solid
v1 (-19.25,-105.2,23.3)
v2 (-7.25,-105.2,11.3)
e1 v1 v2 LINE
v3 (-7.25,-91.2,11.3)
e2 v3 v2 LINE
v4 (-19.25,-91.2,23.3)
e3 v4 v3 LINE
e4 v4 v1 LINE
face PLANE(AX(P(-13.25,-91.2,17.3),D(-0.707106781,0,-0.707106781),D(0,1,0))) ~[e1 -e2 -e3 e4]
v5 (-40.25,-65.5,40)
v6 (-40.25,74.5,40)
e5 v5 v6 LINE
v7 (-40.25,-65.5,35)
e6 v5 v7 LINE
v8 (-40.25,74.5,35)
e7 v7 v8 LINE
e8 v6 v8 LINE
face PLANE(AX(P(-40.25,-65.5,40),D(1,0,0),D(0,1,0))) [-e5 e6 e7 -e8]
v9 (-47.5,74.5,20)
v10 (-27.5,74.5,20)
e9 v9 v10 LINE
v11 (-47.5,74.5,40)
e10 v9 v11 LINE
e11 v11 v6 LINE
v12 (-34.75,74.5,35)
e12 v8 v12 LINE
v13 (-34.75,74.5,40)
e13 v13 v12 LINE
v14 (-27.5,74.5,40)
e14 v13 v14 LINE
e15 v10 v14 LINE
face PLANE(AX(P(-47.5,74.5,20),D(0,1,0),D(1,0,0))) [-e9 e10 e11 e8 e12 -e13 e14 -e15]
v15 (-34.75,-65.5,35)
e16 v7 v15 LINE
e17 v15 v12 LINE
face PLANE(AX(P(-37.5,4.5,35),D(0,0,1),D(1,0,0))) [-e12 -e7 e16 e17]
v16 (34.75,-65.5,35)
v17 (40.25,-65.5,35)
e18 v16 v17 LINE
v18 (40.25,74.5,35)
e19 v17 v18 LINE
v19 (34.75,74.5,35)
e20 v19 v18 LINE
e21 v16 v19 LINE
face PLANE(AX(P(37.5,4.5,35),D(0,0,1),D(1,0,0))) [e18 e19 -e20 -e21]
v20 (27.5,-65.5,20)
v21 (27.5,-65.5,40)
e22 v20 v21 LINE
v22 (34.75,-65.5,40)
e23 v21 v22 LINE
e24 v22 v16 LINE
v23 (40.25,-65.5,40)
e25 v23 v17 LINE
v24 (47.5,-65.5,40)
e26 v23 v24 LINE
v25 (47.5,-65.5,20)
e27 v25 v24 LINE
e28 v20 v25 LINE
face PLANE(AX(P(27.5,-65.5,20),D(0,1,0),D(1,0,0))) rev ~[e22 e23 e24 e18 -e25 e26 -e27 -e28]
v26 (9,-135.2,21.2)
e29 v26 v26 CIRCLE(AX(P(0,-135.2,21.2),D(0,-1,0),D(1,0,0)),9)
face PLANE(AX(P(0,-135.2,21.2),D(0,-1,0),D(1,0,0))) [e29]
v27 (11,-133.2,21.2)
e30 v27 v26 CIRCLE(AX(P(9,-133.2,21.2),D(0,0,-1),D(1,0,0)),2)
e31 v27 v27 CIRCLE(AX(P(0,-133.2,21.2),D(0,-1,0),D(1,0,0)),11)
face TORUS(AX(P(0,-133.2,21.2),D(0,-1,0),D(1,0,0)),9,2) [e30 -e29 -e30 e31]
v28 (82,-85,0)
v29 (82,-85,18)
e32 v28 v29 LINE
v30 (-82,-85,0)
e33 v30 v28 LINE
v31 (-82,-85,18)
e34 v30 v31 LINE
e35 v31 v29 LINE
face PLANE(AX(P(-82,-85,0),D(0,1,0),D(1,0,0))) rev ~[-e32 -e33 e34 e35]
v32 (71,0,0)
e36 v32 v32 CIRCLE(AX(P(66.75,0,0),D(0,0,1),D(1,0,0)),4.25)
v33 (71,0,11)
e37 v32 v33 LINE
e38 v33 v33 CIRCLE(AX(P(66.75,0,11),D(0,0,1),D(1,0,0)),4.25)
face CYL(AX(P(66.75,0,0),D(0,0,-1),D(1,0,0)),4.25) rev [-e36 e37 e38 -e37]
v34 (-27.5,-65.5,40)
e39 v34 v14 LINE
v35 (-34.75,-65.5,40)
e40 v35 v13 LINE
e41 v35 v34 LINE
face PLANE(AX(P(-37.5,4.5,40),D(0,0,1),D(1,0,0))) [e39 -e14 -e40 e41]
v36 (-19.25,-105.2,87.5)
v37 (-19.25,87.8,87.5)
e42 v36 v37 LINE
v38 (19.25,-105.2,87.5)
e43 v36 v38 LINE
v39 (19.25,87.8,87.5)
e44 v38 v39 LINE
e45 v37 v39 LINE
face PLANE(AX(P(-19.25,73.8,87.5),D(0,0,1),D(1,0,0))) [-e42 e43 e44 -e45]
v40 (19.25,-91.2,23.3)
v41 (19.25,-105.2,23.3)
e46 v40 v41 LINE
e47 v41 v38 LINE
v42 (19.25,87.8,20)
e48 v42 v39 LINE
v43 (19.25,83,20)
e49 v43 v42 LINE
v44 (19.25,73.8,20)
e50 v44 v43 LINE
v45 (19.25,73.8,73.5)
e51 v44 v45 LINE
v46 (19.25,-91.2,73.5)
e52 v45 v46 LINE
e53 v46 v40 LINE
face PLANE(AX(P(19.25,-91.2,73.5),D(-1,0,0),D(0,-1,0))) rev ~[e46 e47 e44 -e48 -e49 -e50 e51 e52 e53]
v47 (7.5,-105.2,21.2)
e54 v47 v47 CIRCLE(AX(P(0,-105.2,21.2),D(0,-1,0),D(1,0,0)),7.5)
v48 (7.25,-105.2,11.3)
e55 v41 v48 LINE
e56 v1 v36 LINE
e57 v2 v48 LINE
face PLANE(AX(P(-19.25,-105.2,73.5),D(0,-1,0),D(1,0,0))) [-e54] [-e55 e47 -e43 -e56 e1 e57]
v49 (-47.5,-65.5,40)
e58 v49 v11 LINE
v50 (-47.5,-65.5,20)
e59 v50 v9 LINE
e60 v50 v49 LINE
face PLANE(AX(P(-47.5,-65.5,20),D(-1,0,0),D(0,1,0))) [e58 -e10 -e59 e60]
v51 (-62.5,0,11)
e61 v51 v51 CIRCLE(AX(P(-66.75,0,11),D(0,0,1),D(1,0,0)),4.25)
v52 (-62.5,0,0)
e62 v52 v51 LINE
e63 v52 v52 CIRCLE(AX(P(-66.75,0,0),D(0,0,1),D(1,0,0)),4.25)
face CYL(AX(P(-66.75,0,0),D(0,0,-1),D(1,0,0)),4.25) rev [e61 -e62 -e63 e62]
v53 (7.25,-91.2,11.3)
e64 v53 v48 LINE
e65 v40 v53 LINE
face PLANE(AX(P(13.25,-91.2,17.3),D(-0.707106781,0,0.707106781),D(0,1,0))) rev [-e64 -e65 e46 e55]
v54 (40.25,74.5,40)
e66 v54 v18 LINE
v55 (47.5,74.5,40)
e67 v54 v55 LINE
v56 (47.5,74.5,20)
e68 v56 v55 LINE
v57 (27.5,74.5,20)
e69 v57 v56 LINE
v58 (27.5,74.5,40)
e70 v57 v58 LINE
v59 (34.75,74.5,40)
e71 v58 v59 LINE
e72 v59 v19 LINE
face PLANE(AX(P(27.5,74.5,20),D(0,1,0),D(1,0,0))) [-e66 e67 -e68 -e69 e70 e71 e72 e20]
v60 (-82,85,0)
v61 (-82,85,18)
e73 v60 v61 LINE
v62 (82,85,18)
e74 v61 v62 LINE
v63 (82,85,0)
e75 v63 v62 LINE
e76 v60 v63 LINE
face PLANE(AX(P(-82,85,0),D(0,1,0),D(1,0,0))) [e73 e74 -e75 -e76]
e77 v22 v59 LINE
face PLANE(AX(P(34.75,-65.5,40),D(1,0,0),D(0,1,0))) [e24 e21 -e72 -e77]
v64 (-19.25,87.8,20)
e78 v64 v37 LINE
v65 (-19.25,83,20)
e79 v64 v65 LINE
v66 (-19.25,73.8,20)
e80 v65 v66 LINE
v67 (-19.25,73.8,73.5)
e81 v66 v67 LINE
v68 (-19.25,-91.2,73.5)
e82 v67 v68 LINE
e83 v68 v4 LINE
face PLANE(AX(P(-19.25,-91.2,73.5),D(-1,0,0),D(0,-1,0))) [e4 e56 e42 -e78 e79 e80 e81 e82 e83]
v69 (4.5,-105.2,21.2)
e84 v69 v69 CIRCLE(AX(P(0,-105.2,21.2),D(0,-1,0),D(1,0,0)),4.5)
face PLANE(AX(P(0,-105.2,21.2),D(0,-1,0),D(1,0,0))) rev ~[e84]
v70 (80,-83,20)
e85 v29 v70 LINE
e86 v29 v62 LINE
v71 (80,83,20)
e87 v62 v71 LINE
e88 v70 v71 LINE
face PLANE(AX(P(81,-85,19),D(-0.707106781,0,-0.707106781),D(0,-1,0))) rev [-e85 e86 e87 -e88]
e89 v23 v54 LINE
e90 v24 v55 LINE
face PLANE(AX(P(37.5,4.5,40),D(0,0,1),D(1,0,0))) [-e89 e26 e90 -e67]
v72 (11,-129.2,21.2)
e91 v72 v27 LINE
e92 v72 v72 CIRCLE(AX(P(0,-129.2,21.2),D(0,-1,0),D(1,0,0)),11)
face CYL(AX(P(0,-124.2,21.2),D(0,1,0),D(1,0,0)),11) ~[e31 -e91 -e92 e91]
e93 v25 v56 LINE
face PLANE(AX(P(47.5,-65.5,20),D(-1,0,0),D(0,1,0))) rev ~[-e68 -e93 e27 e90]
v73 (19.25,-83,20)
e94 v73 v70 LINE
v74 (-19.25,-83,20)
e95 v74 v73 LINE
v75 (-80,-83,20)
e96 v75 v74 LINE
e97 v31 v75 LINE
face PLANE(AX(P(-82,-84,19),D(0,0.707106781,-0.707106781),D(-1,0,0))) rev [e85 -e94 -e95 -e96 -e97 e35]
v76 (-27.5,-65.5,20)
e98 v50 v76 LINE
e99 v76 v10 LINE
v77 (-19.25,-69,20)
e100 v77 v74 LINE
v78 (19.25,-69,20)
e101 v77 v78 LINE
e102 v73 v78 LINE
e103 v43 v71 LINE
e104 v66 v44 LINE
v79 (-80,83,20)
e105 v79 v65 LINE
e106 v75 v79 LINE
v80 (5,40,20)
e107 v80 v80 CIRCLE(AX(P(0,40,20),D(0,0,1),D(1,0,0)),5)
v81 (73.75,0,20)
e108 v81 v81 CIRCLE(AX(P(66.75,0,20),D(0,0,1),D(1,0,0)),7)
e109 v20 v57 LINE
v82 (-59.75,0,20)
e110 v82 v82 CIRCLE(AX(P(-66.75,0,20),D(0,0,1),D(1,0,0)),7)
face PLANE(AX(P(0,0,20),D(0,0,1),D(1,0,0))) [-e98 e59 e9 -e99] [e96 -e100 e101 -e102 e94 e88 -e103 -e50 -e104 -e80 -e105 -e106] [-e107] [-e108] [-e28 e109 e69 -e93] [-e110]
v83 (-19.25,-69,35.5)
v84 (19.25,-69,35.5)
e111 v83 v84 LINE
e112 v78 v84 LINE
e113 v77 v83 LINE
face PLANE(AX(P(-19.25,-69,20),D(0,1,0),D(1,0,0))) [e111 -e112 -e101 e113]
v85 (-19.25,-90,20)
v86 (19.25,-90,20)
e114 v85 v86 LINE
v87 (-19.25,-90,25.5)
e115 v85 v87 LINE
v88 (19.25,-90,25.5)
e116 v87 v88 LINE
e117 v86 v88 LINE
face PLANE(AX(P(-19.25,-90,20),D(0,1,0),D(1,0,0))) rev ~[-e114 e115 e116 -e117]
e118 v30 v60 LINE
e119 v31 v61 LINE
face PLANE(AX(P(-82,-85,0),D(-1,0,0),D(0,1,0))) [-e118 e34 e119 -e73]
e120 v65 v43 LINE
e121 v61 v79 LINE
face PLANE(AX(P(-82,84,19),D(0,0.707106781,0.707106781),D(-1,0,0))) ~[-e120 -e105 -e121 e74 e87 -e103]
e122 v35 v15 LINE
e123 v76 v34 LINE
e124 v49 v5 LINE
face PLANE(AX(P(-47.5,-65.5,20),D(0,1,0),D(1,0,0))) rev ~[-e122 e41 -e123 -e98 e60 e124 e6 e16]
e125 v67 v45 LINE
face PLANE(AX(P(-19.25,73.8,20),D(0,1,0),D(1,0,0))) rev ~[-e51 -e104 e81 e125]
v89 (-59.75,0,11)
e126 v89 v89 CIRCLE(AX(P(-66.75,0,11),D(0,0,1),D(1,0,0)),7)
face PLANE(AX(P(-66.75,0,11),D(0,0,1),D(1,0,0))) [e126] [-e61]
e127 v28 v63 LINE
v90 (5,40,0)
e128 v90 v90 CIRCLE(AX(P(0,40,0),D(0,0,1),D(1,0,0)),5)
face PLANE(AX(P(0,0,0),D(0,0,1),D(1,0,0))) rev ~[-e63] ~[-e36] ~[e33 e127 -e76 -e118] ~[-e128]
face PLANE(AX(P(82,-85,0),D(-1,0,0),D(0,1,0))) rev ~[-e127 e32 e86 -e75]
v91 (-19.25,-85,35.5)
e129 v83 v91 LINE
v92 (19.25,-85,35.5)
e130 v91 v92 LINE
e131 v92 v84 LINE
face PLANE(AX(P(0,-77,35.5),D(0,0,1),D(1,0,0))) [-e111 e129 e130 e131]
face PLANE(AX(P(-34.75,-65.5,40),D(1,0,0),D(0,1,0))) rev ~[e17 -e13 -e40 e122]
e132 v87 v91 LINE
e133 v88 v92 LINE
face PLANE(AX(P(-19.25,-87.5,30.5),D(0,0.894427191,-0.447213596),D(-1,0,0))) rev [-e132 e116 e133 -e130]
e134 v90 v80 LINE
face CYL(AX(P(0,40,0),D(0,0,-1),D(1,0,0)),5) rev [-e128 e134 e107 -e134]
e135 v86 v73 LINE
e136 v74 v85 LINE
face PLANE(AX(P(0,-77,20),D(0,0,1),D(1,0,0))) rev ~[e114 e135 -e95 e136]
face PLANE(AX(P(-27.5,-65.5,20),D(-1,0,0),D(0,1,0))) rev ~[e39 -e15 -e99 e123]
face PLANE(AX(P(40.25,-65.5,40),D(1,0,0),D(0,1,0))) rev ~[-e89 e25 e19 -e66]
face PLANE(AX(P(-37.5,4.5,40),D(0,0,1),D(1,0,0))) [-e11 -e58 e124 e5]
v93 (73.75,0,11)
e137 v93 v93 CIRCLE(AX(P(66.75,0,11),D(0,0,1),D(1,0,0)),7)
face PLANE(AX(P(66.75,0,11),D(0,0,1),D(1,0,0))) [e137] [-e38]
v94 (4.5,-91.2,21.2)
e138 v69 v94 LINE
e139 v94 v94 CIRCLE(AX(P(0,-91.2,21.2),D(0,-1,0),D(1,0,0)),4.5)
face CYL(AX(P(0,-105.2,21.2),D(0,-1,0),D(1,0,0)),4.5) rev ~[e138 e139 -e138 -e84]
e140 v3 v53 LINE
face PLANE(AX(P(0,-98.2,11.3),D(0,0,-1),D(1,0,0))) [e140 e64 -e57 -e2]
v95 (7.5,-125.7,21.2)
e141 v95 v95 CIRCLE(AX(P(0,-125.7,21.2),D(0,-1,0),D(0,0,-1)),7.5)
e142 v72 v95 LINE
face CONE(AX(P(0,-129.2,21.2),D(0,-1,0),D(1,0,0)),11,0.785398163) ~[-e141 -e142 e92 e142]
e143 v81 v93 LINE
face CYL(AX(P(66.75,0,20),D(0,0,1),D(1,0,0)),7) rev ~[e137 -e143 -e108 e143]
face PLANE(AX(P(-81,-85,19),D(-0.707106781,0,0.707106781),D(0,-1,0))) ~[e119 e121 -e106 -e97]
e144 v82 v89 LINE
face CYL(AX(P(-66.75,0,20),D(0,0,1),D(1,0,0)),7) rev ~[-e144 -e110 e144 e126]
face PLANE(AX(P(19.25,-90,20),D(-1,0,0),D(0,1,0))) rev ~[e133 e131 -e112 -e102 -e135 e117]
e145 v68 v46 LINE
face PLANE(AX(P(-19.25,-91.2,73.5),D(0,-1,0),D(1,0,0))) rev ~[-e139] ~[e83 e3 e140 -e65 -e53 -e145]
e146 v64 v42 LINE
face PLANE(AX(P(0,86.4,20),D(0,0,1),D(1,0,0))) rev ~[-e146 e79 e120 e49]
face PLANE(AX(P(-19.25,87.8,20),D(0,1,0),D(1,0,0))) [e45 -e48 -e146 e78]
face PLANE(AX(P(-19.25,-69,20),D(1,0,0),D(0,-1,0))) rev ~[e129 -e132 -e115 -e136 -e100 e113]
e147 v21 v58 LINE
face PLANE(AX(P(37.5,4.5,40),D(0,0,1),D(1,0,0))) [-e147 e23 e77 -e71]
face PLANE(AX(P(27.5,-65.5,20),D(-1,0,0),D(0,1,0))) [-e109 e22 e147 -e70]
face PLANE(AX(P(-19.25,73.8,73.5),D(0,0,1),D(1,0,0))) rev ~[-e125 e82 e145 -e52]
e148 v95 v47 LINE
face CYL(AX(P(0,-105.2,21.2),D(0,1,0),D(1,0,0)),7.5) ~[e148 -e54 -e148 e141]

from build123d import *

# Parameters (mm, degrees)
F0_W         = 164
F0_H         = 170
F0_R         = 4.25
F0_R_2       = 5
F1_DEPTH     = 20
F3_SIZE      = 2
F4_DEPTH     = 20
F2_R         = 7
F2_R_2       = 4.25
F5_DEPTH     = 9
F6_W         = 20
F6_H         = 140
F7_DEPTH     = 20
F8_W         = 5.5
F8_H         = 140
F9_DEPTH     = 5
F10_W        = 38.5
F10_H        = 2.8
F10_H_2      = 11.2
F11_DEPTH    = 67.5
F12_W        = 38.5
F12_H        = 14
F13_DEPTH    = 179
F14_W        = 38.5
F14_H        = 14
F15_DEPTH    = 62.2
F16_SIZE     = 12
F17_R        = 4.5
F18_DEPTH    = 14
F19_R        = 7.5
F19_R_2      = 4.5
F20_DEPTH    = 19
F21_R        = 11
F21_R_2      = 7.5
F22_DEPTH    = 11
F23_S5_R     = 7.5
F23_T6_DEPTH = 17
F24_R        = 2
F25_W        = 38.5
F25_H        = 16
F25_H_2      = 5
F26_DEPTH    = 15.5
F27_SIZE2    = 5
F27_SIZE     = 10


# Not quite as in the source:
# - a fillet or chamfer that OpenCascade refuses, or shapes differently, is made with other operations: its cross-section is extruded or revolved along the edge and cut away or added


with BuildPart() as f1:
    # F0 (on Top) → F1 (new body)
    with BuildSketch(Plane.XY):
        Rectangle(F0_W, F0_H)
        with Locations((-66.75, 0)):
            Circle(F0_R, mode=Mode.SUBTRACT)
        with Locations((0, 40)):
            Circle(F0_R_2, mode=Mode.SUBTRACT)
        with Locations((66.75, 0)):
            Circle(F0_R, mode=Mode.SUBTRACT)
    extrude(amount=F1_DEPTH)

    # F3
    f3_edges = [f1.edges().sort_by_distance(p)[0] for p in [
        (82, 0, 20),
        (0, -85, 20),
        (0, 85, 20),
        (-82, 0, 20),
    ]]
    chamfer(f3_edges, length=F3_SIZE)

    # F0 (on Top) → F4 (cut)
    with BuildSketch(Plane.XY):
        with Locations((0, 40)):
            Circle(F0_R_2)
    extrude(amount=F4_DEPTH, mode=Mode.SUBTRACT)

    # F2 (on face) → F5 (cut)
    with BuildSketch(Plane.XY.offset(20)):
        with Locations((-66.75, 0)):
            Circle(F2_R)
        with Locations((-66.75, 0)):
            Circle(F2_R_2, mode=Mode.SUBTRACT)
        with Locations((66.75, 0)):
            Circle(F2_R)
        with Locations((66.75, 0)):
            Circle(F2_R_2, mode=Mode.SUBTRACT)
    extrude(amount=-F5_DEPTH, mode=Mode.SUBTRACT)

    # F6 (on face) → F7 (join)
    with BuildSketch(Plane.XY.offset(20)):
        with Locations((-37.5, 4.5)):
            Rectangle(F6_W, F6_H)
        with Locations((37.5, 4.5)):
            Rectangle(F6_W, F6_H)
    extrude(amount=F7_DEPTH)

    # F8 (on face) → F9 (cut)
    with BuildSketch(Plane.XY.offset(40)):
        with Locations((-37.5, 4.5)):
            Rectangle(F8_W, F8_H)
        with Locations((37.5, 4.5)):
            Rectangle(F8_W, F8_H)
    extrude(amount=-F9_DEPTH, mode=Mode.SUBTRACT)

    # F10 (on face) → F11 (join)
    with BuildSketch(Plane.XY.offset(20)):
        with Locations((0, 86.4)):
            Rectangle(F10_W, F10_H)
        with Locations((0, 79.4)):
            Rectangle(F10_W, F10_H_2)
    extrude(amount=F11_DEPTH)

    # F12 (on face) → F13 (join)
    with BuildSketch(Plane.XZ.offset(-73.8)):
        with Locations((0, 80.5)):
            Rectangle(F12_W, F12_H)
    extrude(amount=F13_DEPTH)

    # F14 (on face) → F15 (join)
    with BuildSketch(Plane(origin=(0, 0, 73.5), x_dir=(1, 0, 0), z_dir=(0, 0, -1))):
        with Locations((0, 98.2)):
            Rectangle(F14_W, F14_H)
    extrude(amount=F15_DEPTH)

    # F16
    f16_edges = [f1.edges().sort_by_distance(p)[0] for p in [
        (-19.25, -98.2, 11.3),
        (19.25, -98.2, 11.3),
    ]]
    chamfer(f16_edges, length=F16_SIZE)

    # F17 (on face) → F18 (cut)
    with BuildSketch(Plane.XZ.offset(105.2)):
        with Locations((0, 21.2)):
            Circle(F17_R)
    extrude(amount=-F18_DEPTH, mode=Mode.SUBTRACT)

    # F19 (on face) → F20 (join)
    with BuildSketch(Plane.XZ.offset(105.2)):
        with Locations((0, 21.2)):
            Circle(F19_R)
        with Locations((0, 21.2)):
            Circle(F19_R_2, mode=Mode.SUBTRACT)
        with Locations((0, 21.2)):
            Circle(F19_R_2)
    extrude(amount=F20_DEPTH)

    # F21 (on face) → F22 (join)
    with BuildSketch(Plane.XZ.offset(124.2)):
        with Locations((0, 21.2)):
            Circle(F21_R)
        with Locations((0, 21.2)):
            Circle(F21_R_2, mode=Mode.SUBTRACT)
        with Locations((0, 21.2)):
            Circle(F21_R_2)
    extrude(amount=F22_DEPTH)

    # F23: chamfer of 5 on 1 edges, made by hand


with BuildPart() as f23_tool2:
    # F23_s3 → F23_t4 (revolve)
    with BuildSketch(Plane.XY.offset(21.2)):
        Polygon((11, -129.2), (6, -124.2), (11, -124.2), align=None)
    revolve(axis=Axis((0, -124.2, 21.2), (0, -1, 0)))

    # F23_s5 → F23_t6 (cut, symmetric)
    with BuildSketch(Plane.XZ.offset(126.7)):
        with Locations((0, 21.2)):
            Circle(F23_S5_R)
    extrude(amount=F23_T6_DEPTH, both=True, mode=Mode.SUBTRACT)


with BuildPart() as f1_1:
    add(f1.part)

    # F23_t1: cut F23_tool2
    add(f23_tool2.part, mode=Mode.SUBTRACT)

    # F24
    f24_edges = [f1_1.edges().sort_by_distance(p)[0] for p in [
        (-11, -135.2, 21.2),
    ]]
    fillet(f24_edges, radius=F24_R)

    # F25 (on face) → F26 (join)
    with BuildSketch(Plane.XY.offset(20)):
        with Locations((0, -77)):
            Rectangle(F25_W, F25_H)
        with Locations((0, -87.5)):
            Rectangle(F25_W, F25_H_2)
    extrude(amount=F26_DEPTH)

    # F27
    f27_edges = [f1_1.edges().sort_by_distance(p)[0] for p in [
        (0, -90, 35.5),
    ]]
    f27_side = f1_1.faces().sort_by_distance((0, -90, 27.75))[0]
    chamfer(f27_edges, length=F27_SIZE, length2=F27_SIZE2, reference=f27_side)


solid = f1_1.part
